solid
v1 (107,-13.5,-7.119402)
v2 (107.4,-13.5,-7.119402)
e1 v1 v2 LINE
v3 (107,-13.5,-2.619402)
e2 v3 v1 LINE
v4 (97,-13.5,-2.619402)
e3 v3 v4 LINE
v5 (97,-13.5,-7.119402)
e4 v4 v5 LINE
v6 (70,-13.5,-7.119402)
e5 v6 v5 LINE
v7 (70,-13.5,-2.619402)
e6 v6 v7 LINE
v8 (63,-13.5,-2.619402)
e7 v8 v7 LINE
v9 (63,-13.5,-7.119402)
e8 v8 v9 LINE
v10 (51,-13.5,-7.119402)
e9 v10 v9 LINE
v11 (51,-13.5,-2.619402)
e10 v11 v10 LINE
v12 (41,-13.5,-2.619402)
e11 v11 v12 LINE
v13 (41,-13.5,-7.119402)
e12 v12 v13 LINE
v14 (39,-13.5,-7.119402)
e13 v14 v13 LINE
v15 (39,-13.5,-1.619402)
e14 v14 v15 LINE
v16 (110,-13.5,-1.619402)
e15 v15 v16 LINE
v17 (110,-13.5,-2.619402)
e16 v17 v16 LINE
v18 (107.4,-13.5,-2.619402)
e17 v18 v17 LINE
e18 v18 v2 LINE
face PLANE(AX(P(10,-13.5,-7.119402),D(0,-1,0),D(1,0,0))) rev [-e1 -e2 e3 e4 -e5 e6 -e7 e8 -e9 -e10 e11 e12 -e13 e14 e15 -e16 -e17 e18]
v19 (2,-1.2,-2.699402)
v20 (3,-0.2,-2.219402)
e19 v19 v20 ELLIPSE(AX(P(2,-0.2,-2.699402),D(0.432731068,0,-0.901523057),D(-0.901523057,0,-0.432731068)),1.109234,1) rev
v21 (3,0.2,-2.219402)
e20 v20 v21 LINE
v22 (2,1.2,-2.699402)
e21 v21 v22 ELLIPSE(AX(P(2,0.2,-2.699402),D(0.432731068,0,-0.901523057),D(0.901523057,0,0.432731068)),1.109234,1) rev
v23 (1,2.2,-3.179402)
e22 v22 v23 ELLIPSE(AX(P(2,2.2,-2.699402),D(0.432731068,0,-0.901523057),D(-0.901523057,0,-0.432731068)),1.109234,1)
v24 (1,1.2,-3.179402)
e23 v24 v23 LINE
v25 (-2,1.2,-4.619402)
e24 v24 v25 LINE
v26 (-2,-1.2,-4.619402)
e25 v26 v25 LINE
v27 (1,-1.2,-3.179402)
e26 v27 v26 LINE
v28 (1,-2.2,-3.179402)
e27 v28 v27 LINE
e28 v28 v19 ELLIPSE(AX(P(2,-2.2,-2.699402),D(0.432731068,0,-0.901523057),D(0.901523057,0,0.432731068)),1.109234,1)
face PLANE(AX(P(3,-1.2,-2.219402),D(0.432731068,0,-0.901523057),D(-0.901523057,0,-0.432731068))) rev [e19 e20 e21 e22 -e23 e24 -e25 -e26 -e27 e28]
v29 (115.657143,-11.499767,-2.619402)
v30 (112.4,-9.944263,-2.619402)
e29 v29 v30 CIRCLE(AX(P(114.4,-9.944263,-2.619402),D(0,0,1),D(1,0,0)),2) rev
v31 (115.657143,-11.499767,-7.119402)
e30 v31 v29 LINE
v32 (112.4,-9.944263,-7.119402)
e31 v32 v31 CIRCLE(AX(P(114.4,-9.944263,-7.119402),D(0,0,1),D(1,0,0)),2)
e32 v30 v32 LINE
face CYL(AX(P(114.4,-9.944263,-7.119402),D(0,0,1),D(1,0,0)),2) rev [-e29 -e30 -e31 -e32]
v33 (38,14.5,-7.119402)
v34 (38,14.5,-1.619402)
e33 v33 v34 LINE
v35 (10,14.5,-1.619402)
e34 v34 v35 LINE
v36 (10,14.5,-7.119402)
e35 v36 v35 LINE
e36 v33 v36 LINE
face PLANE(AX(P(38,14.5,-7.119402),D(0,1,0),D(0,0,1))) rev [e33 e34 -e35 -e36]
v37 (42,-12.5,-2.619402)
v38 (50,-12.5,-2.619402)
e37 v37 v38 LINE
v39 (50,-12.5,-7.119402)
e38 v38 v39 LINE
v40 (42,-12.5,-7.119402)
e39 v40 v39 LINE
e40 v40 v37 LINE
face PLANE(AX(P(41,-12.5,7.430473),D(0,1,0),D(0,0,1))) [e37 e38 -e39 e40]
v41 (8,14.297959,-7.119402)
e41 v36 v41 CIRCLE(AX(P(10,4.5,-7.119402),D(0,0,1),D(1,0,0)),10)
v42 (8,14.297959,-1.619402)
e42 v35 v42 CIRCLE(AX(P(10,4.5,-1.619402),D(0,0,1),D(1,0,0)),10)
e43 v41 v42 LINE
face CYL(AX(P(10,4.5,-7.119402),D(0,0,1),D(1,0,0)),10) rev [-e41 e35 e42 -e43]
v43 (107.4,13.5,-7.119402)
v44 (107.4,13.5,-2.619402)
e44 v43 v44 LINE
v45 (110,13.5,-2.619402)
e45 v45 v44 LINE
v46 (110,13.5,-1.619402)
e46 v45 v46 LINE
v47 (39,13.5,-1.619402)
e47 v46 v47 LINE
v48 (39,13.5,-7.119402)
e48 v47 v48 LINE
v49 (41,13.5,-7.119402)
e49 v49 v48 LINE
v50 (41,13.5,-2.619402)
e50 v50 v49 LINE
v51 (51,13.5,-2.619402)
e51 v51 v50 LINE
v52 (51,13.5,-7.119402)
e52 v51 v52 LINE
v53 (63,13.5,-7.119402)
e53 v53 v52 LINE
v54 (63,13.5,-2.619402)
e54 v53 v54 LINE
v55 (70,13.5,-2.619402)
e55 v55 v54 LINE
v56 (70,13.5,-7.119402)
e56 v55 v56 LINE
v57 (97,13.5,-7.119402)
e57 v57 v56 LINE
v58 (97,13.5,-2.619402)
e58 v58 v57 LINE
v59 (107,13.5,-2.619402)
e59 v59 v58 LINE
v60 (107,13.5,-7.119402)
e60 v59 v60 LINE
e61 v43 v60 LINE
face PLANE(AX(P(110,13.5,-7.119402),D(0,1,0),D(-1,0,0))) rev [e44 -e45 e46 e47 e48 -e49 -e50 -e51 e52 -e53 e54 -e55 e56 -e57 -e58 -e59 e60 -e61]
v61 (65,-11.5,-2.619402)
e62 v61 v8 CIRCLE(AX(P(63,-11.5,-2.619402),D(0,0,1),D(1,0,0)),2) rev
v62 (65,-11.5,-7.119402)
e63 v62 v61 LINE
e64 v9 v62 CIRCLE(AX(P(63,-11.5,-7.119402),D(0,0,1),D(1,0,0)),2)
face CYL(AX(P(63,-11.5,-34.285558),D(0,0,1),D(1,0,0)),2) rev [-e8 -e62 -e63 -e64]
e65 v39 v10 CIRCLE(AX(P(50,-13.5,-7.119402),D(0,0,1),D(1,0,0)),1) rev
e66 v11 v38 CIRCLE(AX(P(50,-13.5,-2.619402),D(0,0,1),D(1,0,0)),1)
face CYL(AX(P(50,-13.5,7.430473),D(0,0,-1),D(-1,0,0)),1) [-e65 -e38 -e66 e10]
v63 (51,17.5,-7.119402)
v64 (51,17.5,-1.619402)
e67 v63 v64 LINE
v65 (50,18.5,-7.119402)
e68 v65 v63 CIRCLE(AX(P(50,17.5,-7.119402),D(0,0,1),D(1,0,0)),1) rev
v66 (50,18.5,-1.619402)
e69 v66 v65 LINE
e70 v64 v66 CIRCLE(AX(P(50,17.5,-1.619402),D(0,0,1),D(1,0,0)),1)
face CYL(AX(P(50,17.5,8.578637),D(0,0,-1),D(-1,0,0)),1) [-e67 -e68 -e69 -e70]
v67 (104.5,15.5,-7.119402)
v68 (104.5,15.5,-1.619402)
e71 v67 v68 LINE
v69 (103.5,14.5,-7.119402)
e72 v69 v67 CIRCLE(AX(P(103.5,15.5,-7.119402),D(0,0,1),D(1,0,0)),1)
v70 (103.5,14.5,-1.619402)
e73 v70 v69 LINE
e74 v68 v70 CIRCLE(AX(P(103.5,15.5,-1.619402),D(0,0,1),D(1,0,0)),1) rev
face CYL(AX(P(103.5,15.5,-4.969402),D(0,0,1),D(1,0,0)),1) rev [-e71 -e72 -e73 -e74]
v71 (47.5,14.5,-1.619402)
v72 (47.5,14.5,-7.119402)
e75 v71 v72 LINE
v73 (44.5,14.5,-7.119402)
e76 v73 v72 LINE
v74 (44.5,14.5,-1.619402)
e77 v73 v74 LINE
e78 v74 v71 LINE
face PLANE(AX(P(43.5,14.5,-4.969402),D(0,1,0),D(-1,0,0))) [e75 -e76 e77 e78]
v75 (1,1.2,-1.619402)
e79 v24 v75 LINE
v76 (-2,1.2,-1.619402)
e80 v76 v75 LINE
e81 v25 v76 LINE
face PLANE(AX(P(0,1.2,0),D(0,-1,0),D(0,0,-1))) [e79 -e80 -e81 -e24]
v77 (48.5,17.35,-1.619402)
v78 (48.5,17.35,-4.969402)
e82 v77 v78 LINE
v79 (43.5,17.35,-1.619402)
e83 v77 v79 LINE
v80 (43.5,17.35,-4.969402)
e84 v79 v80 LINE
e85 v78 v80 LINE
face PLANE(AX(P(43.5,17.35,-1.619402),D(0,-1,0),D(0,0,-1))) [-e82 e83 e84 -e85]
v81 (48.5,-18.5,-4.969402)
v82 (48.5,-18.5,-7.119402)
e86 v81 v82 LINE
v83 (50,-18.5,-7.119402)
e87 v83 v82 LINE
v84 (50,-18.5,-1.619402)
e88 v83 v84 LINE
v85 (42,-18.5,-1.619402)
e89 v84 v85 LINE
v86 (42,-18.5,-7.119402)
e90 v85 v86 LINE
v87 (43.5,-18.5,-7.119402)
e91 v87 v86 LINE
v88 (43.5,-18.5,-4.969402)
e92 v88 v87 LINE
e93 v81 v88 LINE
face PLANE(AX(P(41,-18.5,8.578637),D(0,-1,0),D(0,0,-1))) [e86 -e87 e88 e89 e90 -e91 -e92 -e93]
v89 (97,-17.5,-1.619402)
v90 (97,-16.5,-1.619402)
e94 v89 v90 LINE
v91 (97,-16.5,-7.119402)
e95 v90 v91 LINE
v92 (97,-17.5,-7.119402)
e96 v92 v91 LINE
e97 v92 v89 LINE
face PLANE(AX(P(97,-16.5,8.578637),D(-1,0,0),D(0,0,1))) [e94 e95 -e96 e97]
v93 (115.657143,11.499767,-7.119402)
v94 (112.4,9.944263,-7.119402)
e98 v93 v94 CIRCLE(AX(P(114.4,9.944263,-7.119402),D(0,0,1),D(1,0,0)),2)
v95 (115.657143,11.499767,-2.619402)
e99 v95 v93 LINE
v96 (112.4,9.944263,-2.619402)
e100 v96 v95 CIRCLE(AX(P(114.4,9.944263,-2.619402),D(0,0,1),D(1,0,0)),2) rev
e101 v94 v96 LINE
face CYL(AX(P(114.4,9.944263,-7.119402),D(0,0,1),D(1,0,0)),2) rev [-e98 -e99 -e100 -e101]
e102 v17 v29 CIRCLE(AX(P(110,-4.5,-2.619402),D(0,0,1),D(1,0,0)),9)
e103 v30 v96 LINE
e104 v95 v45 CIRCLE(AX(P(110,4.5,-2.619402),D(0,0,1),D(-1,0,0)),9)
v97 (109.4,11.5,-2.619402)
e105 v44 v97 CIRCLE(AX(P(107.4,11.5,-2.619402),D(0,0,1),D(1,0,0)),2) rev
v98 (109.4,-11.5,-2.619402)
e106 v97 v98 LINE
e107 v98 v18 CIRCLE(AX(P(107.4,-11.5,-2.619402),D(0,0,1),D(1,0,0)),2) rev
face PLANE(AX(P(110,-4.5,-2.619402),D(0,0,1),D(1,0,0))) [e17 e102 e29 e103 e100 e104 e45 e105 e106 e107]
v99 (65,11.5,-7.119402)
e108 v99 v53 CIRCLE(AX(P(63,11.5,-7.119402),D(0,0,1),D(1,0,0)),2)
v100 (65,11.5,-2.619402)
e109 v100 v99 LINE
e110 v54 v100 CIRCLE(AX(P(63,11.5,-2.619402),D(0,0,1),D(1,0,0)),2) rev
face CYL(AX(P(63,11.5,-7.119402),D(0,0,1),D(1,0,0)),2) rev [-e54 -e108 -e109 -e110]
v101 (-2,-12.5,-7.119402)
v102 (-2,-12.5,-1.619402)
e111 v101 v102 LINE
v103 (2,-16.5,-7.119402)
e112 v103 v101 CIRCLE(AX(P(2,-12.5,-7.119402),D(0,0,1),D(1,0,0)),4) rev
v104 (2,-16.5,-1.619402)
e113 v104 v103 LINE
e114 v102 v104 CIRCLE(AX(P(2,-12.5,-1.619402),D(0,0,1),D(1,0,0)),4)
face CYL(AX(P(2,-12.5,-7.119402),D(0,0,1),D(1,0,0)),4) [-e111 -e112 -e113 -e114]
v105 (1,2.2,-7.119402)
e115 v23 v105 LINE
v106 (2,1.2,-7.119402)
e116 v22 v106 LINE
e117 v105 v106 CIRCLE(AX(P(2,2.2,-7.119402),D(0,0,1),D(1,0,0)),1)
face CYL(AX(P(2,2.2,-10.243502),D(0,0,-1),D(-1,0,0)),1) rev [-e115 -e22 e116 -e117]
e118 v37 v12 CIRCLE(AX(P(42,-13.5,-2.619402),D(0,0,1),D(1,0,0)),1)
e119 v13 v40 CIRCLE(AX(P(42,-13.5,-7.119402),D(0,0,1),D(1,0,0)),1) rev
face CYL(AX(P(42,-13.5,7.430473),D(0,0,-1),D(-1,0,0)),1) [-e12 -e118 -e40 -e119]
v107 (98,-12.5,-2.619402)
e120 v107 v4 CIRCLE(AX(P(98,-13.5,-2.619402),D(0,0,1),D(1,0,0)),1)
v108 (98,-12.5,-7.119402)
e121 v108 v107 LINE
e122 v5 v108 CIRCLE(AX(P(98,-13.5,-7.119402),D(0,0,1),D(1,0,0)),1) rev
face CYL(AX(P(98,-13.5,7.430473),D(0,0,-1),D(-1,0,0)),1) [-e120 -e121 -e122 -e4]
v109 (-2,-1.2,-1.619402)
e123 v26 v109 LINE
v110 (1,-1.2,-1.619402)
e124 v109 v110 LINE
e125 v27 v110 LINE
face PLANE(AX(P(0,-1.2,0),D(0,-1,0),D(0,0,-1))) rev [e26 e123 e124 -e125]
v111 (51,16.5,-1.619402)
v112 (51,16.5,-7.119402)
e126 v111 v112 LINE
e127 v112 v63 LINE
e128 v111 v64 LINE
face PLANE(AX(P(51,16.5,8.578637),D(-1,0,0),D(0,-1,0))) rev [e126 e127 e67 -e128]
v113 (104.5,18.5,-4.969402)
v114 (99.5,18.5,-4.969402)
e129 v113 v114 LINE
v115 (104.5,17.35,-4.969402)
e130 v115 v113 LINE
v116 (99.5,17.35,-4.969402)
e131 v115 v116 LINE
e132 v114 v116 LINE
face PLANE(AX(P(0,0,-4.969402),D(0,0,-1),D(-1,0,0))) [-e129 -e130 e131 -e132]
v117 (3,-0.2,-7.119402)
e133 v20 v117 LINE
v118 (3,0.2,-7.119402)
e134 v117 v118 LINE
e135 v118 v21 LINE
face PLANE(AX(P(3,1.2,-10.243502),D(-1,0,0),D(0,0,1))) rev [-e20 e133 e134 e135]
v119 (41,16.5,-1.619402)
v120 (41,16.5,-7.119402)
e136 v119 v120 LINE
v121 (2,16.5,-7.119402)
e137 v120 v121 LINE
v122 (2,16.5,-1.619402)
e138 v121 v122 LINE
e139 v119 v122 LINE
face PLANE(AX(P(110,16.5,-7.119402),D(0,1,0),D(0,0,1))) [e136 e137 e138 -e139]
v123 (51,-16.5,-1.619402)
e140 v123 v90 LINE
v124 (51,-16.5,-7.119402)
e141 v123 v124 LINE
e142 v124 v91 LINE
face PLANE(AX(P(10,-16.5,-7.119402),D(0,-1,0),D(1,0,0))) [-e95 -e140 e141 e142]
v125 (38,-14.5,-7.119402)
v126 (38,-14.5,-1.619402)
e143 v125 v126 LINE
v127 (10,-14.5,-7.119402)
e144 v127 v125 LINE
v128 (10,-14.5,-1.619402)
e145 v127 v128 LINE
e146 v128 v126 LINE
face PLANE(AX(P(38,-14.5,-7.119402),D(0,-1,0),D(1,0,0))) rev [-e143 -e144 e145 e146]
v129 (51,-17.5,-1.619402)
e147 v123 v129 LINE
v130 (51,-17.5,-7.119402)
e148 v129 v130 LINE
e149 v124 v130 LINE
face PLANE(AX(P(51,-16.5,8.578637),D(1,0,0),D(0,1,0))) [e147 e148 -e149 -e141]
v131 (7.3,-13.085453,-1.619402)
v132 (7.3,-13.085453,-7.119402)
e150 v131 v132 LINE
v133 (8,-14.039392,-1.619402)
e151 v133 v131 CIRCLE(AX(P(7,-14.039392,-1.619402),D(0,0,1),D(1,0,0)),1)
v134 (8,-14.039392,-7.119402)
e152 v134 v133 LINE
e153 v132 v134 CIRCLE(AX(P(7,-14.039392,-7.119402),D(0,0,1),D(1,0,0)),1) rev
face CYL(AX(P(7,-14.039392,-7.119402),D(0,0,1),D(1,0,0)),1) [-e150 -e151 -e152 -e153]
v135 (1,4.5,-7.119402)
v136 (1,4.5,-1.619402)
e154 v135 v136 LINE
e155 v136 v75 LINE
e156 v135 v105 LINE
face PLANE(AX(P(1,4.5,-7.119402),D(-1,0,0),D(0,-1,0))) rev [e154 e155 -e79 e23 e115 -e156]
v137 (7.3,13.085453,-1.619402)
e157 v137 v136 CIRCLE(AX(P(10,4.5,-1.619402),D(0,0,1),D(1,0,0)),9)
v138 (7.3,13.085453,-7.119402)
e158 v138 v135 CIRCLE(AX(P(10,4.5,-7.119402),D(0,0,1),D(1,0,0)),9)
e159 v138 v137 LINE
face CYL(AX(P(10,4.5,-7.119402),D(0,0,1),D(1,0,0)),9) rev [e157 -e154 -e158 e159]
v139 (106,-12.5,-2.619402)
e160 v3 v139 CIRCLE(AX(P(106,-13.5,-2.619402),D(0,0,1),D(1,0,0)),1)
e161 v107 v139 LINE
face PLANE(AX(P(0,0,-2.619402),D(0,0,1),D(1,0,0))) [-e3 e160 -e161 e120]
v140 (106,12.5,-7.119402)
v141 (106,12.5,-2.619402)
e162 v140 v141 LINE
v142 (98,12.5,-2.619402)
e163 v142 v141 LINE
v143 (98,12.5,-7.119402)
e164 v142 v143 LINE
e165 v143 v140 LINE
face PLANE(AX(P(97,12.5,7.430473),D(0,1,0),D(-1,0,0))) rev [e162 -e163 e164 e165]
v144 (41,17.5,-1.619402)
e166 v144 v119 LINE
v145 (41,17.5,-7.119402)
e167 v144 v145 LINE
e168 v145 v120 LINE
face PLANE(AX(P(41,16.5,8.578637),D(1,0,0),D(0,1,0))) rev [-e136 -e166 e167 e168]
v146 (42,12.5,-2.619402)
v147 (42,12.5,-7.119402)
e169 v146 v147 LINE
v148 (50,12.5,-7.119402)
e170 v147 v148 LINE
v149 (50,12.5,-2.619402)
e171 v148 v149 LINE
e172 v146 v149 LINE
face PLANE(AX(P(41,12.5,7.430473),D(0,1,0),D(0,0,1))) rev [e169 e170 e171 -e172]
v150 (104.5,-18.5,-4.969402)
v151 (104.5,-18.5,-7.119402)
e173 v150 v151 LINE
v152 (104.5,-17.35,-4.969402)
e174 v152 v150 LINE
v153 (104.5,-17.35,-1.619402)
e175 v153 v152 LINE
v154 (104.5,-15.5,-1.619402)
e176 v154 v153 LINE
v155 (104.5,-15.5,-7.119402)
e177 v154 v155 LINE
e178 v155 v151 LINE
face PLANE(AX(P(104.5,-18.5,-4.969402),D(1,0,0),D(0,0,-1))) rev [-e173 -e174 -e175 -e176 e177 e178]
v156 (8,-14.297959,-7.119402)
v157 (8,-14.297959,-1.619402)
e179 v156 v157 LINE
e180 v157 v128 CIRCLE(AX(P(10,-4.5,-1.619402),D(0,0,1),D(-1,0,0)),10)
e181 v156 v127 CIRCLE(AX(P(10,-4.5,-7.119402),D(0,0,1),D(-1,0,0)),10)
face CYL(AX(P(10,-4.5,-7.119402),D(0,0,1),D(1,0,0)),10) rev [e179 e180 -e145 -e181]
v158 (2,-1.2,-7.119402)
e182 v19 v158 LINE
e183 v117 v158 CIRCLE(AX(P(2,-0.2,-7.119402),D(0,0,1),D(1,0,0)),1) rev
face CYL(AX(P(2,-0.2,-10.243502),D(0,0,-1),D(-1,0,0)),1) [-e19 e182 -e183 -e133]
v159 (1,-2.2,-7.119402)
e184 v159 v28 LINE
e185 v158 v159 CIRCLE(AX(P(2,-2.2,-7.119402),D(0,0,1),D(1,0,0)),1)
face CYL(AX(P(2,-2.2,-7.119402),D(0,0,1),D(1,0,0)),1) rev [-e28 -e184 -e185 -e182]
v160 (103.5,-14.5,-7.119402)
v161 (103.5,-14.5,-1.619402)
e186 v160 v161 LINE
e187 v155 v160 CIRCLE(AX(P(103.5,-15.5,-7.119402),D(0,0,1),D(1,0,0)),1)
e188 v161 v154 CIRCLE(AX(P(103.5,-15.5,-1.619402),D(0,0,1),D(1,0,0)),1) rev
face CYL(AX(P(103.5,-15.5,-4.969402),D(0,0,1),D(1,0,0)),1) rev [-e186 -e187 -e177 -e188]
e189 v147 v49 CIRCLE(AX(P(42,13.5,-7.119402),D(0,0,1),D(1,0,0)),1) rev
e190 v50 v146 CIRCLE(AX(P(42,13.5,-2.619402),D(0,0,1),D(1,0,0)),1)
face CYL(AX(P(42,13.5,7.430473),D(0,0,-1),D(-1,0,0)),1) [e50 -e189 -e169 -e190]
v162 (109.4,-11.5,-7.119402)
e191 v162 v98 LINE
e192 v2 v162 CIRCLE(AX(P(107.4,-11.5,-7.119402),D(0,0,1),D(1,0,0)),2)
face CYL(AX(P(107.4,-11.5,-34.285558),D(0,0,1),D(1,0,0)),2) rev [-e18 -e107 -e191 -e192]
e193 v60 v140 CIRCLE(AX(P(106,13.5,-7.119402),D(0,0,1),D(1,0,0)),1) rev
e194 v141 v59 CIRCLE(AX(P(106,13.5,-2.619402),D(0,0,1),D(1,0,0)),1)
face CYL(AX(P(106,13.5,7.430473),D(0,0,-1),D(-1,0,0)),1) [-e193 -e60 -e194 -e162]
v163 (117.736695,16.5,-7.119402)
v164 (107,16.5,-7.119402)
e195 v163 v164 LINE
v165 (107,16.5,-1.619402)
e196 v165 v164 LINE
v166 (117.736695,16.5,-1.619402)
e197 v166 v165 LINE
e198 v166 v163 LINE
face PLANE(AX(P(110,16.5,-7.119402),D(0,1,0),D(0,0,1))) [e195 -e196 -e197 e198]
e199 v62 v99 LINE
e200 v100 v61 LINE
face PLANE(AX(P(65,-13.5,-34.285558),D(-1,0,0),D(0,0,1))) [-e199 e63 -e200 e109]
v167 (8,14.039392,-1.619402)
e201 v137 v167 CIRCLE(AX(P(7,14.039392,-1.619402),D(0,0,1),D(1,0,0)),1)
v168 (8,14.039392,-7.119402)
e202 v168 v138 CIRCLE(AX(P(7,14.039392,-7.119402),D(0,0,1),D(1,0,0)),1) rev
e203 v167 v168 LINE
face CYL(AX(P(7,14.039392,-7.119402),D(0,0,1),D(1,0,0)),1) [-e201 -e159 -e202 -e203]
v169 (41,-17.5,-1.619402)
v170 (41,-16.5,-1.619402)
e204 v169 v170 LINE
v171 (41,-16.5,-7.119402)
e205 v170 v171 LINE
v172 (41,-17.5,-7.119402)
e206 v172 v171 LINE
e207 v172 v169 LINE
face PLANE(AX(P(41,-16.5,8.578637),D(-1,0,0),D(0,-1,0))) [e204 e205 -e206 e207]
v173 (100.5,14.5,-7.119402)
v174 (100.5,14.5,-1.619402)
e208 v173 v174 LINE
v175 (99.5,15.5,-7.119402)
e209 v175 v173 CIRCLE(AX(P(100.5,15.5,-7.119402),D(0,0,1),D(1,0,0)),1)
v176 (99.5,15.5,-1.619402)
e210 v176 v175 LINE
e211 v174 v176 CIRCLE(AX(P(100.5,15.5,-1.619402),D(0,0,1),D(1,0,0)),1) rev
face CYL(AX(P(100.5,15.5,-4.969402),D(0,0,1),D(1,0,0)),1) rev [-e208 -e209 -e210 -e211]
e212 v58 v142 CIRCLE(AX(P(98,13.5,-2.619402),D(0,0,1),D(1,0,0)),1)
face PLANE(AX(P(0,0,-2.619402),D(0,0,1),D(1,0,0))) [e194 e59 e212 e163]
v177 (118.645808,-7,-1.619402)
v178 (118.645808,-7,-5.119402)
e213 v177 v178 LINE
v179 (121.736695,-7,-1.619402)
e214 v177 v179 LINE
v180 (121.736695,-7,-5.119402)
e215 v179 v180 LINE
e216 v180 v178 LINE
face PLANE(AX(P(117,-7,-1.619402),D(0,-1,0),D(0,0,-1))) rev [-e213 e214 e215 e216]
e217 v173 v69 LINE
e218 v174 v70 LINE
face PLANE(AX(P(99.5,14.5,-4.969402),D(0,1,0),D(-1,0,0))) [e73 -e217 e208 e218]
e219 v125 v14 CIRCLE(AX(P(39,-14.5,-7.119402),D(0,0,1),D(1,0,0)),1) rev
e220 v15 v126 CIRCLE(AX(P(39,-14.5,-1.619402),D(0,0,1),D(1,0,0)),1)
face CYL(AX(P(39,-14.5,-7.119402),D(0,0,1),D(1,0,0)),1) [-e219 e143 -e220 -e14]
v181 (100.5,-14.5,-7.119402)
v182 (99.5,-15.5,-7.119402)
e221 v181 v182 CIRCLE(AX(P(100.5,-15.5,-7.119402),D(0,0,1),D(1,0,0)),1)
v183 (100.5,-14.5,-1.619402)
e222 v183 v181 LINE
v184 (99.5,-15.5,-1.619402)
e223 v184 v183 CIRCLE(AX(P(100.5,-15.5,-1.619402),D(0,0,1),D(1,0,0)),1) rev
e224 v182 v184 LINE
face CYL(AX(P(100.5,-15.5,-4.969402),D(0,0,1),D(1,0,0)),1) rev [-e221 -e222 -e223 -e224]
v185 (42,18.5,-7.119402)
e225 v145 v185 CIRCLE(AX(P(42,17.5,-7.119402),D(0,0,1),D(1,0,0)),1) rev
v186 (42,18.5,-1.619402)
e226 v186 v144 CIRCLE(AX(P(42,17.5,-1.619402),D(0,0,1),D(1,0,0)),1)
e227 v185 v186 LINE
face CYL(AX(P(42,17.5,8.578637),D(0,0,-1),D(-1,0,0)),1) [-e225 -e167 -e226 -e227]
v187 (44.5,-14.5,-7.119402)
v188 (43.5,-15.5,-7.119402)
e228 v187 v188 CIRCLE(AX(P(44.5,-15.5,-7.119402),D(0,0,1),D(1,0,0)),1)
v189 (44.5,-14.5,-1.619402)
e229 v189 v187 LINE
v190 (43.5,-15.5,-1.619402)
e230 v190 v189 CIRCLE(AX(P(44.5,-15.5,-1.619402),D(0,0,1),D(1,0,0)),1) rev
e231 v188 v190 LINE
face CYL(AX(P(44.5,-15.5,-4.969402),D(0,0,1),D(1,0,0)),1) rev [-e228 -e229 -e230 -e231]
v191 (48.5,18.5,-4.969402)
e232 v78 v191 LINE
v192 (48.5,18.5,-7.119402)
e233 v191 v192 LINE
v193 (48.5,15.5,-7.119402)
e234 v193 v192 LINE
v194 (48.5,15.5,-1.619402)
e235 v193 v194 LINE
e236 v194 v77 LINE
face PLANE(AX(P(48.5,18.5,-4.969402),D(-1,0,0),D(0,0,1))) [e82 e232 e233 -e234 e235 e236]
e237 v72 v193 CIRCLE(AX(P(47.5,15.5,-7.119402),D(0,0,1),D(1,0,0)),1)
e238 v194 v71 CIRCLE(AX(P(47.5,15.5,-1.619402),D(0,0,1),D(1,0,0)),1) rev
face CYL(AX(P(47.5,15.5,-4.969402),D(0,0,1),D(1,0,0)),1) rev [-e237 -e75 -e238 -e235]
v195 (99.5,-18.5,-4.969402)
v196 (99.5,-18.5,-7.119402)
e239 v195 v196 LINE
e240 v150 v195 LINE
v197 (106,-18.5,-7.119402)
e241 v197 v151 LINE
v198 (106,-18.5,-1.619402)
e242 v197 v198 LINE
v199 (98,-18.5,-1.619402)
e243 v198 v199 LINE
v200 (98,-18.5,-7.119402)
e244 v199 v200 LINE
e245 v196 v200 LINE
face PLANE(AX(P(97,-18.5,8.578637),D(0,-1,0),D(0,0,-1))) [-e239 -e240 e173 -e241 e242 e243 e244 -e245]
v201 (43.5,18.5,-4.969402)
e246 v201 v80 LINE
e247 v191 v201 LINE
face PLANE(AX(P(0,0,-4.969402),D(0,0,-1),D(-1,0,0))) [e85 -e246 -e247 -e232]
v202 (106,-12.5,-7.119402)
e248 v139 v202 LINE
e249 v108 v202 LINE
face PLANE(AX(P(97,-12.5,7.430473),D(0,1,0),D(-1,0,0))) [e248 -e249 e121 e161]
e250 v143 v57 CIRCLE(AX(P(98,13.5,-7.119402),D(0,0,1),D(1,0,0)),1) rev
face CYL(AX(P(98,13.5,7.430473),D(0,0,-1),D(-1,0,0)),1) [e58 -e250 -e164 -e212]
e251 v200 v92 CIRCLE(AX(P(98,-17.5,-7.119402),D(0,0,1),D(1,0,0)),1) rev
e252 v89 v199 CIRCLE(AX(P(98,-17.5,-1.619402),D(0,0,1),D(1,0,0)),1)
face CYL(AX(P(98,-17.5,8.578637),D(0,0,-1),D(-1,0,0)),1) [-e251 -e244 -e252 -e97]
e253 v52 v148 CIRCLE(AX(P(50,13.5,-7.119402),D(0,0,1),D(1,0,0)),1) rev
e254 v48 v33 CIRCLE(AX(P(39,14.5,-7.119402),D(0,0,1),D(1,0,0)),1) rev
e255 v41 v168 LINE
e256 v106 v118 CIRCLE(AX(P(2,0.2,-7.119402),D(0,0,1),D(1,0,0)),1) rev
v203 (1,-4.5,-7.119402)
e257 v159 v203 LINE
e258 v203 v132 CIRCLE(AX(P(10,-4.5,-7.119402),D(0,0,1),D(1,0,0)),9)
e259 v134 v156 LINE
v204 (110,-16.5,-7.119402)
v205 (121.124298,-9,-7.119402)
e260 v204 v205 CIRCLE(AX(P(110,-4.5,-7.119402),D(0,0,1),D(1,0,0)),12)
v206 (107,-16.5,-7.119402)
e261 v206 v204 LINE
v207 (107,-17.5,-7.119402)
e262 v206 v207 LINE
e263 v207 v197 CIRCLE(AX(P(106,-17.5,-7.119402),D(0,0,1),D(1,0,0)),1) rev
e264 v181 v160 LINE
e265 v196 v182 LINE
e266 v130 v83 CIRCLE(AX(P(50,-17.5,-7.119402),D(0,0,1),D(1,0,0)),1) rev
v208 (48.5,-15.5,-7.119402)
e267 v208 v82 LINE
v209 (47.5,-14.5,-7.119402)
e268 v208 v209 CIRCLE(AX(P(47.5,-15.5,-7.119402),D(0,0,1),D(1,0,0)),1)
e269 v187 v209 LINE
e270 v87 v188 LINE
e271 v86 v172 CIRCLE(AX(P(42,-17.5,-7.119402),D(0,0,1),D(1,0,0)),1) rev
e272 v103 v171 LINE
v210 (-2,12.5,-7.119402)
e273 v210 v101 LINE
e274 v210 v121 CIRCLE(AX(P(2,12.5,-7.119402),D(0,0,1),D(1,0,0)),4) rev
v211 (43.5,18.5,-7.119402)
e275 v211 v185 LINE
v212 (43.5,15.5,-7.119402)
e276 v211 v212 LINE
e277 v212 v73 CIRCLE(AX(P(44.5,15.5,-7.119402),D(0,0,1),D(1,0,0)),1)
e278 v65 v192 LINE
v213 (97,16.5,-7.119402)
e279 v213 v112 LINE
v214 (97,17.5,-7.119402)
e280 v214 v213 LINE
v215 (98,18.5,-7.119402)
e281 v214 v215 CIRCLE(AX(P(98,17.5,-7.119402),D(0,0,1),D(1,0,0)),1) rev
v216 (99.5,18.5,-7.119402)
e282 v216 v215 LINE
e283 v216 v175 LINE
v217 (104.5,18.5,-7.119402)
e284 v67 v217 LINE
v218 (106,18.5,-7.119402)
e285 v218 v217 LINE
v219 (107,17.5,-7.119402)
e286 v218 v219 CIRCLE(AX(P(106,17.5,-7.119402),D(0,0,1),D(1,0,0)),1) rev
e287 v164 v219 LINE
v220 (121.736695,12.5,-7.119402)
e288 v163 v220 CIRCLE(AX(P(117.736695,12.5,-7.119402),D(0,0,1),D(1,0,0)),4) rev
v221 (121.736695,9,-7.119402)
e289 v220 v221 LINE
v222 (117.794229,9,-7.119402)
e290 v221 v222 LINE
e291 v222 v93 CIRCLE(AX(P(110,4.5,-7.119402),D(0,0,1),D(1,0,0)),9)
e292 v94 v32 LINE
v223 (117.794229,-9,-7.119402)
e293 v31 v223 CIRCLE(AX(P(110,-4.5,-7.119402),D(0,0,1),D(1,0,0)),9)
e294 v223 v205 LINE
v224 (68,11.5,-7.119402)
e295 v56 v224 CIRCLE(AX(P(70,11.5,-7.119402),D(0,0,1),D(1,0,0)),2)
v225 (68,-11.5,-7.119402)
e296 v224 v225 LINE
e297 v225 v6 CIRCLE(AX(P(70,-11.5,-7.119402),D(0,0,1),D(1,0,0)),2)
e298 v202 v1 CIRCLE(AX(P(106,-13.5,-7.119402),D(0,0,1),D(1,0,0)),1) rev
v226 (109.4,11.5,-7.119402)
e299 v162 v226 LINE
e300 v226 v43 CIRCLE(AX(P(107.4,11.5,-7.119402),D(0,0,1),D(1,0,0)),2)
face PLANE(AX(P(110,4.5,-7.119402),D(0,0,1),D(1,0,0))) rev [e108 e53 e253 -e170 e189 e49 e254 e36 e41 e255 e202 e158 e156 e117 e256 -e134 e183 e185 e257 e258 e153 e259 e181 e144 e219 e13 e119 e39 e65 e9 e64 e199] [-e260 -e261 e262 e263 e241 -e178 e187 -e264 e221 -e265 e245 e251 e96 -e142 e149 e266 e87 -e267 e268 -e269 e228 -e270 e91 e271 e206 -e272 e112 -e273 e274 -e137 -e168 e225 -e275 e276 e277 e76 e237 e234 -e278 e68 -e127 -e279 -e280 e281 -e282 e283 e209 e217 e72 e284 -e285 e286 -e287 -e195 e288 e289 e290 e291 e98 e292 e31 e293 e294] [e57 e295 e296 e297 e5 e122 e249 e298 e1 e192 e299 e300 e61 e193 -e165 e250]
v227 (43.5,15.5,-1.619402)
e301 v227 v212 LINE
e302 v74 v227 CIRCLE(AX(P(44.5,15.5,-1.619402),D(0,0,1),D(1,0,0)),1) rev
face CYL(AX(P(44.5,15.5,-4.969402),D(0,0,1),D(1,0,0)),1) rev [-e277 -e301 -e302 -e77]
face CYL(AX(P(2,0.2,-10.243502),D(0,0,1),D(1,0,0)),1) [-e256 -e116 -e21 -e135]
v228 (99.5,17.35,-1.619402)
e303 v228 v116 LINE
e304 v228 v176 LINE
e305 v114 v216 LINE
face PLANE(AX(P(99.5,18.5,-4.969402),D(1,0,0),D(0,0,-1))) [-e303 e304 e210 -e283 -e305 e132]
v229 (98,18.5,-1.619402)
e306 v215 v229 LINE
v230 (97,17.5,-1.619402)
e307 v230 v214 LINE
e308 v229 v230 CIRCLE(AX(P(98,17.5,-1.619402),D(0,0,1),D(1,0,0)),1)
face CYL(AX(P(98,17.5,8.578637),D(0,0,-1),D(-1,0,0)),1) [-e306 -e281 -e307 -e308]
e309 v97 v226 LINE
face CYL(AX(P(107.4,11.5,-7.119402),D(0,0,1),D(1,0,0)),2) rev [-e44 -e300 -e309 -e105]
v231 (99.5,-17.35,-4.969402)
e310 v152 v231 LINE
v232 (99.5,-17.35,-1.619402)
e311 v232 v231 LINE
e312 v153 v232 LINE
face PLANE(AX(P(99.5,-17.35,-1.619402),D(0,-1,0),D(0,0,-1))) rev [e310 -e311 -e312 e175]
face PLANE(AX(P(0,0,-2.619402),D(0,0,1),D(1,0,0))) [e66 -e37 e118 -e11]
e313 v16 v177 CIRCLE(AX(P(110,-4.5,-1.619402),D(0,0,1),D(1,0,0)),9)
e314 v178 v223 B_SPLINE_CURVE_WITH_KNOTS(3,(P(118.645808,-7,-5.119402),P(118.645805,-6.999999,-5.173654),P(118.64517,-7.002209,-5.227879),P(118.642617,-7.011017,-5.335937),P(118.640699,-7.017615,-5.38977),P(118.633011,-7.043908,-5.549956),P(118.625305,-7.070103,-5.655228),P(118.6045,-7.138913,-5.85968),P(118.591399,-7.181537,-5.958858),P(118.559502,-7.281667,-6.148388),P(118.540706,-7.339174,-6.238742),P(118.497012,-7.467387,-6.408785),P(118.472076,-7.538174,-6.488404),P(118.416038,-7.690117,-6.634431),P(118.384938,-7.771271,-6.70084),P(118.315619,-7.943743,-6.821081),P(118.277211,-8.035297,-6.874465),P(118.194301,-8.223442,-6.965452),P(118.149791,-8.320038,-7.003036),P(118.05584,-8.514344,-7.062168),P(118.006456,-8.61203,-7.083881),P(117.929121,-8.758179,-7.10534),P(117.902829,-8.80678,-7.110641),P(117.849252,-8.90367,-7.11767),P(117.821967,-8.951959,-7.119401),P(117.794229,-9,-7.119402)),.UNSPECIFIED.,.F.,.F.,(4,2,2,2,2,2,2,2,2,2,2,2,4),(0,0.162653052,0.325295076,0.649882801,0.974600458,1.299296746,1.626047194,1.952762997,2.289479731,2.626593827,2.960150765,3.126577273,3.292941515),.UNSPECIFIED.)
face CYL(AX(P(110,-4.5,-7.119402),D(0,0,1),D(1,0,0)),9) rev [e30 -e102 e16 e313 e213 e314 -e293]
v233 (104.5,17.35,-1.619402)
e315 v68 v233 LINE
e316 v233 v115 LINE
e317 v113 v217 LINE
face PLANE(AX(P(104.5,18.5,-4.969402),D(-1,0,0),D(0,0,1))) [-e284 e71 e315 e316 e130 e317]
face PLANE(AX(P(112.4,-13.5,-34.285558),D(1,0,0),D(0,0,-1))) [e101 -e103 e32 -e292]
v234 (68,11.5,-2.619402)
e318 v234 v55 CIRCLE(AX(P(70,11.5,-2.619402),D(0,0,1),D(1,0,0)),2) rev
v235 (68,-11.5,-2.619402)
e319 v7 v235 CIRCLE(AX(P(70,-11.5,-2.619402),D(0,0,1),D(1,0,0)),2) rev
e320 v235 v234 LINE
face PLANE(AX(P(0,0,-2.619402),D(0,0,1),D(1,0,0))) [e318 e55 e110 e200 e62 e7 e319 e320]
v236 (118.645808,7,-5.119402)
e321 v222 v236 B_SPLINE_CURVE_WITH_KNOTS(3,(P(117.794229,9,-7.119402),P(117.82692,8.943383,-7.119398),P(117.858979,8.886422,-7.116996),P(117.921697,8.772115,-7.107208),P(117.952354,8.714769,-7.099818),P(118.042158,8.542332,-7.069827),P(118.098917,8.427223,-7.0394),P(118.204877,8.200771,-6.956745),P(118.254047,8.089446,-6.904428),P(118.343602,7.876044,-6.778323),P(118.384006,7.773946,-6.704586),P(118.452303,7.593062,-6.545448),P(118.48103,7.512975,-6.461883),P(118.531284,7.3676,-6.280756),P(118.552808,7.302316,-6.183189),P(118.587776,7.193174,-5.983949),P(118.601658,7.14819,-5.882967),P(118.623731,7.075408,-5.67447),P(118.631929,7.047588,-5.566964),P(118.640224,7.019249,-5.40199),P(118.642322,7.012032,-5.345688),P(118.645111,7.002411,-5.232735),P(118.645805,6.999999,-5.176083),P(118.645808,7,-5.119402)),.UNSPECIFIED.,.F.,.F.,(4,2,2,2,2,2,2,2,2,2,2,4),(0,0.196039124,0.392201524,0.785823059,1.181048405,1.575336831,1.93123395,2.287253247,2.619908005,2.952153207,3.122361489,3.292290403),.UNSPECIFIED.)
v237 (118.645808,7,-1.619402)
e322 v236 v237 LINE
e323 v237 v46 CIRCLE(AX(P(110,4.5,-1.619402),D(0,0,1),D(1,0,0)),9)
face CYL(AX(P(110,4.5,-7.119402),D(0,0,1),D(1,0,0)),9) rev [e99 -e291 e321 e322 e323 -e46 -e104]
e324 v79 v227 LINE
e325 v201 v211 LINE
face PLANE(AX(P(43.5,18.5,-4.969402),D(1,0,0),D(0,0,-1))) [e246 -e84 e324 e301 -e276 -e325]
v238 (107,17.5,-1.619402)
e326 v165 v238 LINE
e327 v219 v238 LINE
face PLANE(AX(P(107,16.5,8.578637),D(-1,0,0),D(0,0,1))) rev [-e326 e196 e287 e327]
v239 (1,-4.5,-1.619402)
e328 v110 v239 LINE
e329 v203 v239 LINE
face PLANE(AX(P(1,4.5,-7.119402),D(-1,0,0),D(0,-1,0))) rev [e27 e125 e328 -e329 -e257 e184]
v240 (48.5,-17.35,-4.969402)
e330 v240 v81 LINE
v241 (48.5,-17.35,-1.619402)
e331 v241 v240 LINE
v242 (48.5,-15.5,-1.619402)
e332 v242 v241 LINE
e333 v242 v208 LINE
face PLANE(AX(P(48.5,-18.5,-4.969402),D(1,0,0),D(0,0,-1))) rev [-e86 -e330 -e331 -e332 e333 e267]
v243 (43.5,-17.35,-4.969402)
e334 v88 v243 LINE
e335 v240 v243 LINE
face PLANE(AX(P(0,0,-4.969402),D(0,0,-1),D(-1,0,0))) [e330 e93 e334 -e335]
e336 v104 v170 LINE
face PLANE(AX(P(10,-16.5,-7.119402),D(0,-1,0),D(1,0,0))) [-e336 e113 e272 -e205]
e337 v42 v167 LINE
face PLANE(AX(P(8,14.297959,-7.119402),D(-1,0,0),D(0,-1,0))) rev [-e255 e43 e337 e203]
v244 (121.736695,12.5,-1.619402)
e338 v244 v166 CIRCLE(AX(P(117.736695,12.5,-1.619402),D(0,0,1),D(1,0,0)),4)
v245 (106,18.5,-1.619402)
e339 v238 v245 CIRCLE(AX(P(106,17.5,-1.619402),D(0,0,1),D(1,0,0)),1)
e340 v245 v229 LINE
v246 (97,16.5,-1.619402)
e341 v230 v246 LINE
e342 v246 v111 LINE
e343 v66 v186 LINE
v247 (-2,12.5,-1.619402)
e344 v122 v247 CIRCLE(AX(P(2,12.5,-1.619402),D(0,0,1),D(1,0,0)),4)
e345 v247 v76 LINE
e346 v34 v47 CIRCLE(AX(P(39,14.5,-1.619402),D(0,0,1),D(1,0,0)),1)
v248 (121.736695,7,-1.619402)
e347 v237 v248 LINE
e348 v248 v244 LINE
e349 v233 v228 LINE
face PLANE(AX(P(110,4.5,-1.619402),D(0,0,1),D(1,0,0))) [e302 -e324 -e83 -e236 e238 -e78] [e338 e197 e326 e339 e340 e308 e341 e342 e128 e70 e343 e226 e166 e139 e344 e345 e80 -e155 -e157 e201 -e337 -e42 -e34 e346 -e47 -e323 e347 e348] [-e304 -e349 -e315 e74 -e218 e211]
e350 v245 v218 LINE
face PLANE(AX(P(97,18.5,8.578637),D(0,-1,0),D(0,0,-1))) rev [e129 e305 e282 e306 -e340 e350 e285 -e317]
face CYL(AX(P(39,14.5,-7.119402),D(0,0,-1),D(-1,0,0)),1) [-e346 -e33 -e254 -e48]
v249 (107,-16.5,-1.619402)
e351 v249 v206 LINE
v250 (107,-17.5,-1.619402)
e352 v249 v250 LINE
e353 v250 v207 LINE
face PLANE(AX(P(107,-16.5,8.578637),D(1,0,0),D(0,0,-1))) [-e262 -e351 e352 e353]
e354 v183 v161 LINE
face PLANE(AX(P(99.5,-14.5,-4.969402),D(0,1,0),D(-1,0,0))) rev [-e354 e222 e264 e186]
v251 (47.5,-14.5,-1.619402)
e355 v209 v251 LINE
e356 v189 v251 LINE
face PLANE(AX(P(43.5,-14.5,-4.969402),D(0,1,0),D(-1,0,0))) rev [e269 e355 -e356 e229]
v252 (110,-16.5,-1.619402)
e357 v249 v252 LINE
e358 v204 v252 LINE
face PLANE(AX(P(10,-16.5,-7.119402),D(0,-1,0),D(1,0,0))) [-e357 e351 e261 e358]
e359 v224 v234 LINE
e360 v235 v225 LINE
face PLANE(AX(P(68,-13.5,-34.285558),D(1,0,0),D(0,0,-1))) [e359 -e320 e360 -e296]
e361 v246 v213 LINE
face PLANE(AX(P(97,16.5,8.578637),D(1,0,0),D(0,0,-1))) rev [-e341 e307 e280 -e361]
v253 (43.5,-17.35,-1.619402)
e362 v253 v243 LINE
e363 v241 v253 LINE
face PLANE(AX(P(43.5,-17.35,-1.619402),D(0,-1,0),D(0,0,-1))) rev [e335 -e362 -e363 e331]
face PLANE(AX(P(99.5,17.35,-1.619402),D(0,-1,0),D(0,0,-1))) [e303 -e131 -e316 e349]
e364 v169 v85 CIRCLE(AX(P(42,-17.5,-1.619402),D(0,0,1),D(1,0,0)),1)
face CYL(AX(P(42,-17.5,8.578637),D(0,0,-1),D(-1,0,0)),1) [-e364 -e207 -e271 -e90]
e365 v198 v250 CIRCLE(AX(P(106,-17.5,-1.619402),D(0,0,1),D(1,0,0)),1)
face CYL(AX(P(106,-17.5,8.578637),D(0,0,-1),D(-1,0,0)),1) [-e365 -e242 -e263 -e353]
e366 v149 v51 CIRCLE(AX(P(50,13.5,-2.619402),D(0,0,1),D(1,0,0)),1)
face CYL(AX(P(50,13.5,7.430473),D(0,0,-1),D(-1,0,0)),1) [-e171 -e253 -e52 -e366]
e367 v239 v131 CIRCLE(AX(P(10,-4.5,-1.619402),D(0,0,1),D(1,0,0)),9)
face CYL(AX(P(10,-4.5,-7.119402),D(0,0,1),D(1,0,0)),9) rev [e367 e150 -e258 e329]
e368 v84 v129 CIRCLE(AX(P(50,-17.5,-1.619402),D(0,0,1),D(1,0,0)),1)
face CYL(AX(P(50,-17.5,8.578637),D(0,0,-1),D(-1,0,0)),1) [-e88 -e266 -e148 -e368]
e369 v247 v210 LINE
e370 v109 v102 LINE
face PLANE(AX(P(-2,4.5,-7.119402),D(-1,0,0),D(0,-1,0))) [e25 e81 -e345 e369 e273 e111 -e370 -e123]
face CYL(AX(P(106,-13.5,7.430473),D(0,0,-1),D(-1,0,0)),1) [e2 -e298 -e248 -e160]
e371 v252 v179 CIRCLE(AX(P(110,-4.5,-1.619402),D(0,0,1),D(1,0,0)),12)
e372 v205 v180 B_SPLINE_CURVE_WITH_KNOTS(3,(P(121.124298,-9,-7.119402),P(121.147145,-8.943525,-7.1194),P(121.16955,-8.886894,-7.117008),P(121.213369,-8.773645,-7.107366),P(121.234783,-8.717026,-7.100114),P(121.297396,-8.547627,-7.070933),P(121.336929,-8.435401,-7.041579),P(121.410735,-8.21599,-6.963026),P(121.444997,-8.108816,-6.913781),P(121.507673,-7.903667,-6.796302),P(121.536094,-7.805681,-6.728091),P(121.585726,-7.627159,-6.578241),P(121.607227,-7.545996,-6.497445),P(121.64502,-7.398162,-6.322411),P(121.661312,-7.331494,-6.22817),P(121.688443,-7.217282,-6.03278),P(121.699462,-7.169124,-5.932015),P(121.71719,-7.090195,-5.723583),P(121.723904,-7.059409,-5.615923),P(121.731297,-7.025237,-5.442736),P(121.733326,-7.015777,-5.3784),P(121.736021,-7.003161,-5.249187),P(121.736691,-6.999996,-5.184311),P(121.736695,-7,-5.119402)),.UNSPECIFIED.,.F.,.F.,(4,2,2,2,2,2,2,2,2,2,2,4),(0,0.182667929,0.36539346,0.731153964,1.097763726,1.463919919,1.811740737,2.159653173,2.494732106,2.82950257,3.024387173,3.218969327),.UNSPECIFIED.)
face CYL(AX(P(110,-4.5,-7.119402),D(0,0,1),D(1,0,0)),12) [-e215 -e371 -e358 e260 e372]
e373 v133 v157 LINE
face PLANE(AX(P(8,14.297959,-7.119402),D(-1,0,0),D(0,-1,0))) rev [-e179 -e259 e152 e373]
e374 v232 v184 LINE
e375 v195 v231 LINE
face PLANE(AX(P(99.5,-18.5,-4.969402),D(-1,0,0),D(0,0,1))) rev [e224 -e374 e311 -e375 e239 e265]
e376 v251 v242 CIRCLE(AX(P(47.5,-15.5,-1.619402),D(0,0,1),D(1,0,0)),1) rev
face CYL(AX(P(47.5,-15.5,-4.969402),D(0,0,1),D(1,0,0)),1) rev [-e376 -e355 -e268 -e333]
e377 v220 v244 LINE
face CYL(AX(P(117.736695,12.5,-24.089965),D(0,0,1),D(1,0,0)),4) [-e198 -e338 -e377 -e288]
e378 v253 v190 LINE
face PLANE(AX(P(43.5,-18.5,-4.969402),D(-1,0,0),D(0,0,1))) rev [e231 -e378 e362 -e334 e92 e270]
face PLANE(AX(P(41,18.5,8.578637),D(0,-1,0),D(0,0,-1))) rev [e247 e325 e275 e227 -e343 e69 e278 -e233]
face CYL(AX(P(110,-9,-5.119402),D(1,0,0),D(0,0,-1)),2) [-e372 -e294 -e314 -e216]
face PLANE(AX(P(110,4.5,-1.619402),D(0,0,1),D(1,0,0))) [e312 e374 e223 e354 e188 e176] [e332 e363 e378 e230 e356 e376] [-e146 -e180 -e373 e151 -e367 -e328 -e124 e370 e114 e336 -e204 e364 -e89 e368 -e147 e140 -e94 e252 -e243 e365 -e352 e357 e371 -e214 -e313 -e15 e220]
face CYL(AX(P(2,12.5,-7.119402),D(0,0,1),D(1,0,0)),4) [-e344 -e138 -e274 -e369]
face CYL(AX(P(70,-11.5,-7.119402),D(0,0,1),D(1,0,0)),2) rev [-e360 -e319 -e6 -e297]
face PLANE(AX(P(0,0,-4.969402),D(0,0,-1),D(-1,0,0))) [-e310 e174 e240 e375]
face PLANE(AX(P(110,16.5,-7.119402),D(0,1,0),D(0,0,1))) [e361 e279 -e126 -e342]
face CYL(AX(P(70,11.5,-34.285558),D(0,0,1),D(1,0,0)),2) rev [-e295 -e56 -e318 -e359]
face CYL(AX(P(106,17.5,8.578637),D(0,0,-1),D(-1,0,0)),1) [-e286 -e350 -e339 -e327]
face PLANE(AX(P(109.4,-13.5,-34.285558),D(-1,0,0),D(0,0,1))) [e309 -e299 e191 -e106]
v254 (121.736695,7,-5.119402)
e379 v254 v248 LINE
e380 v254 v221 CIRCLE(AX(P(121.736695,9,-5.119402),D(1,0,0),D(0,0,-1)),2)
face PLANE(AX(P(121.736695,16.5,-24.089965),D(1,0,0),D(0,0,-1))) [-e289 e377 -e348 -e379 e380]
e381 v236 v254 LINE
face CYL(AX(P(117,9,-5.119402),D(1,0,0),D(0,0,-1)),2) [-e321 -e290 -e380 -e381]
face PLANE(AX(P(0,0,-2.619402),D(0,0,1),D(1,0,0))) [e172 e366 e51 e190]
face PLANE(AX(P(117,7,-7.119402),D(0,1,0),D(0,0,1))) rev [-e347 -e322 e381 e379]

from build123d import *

# Parameters (mm, degrees)
BOSS_EXTRUDE2_DEPTH                        = 5.5
SKETCH4_W                                  = 3
SKETCH4_H                                  = 27
BOSS_EXTRUDE4_CROSS_STRUCTURES_DEPTH       = 5.5
SKETCH6_W                                  = 3
SKETCH6_H                                  = 27
CUT_EXTRUDE3_1_MM_SPACING_DEPTH            = 1
CUT_EXTRUDE4_ELECTRONICS_SPACING_DEPTH     = 124.233518168
SKETCH8_W                                  = 5.5
SKETCH8_H                                  = 14
CUT_EXTRUDE2_USB_C_CUTOUT_DEPTH            = 5
SKETCH10_W                                 = 2
SKETCH10_H                                 = 2.4
BOSS_EXTRUDE3_DEPTH                        = 5.5
CUT_EXTRUDE1_LED_OPENING_DEPTH             = 1.2
SKETCH12_W                                 = 10
SKETCH12_H                                 = 2
BOSS_EXTRUDE4_SNAP_BUMPS_DEPTH             = 5.5
SKETCH13_W                                 = 5
SKETCH13_H                                 = 4
CUT_EXTRUDE2_SNAP_SEAT_2_15_ORIGINAL_DEPTH = 2.15
SKETCH14_W                                 = 5
SKETCH14_H                                 = 2.85
CUT_EXTRUDE3_SNAP_POST_CUT_DEPTH           = 124.179930633
SKETCH15_W                                 = 10
SKETCH15_H                                 = 1
BOSS_EXTRUDE4_DEPTH                        = 4.5
FILLET3_R                                  = 1
FILLET4_R                                  = 1
FILLET5_R                                  = 2
FILLET6_SNAP_FEATURES_R                    = 1
BOSS_EXTRUDE7_DEPTH                        = 5.5
FILLET7_R                                  = 4
FILLET8_R                                  = 2


with BuildPart() as part:
    # Sketch3 → Boss-Extrude2 (new body)
    with BuildSketch(Plane.XY.offset(-1.6194024)):
        with BuildLine():
            Line((110, 16.5), (10, 16.5))
            ThreePointArc((10, 16.5), (1.514718626, 12.985281374), (-2, 4.5))
            Line((-2, 4.5), (-2, -4.5))
            ThreePointArc((-2, -4.5), (1.514718626, -12.985281374), (10, -16.5))
            Line((10, -16.5), (110, -16.5))
            ThreePointArc((110, -16.5), (118.485281374, -12.985281374), (122, -4.5))
            Line((122, -4.5), (122, 4.5))
            ThreePointArc((122, 4.5), (118.485281374, 12.985281374), (110, 16.5))
        make_face()
        with BuildLine():
            Line((119, -4.5), (119, 4.5))
            ThreePointArc((119, 4.5), (116.363961031, 10.863961031), (110, 13.5))
            Line((110, 13.5), (10, 13.5))
            ThreePointArc((10, 13.5), (3.636038969, 10.863961031), (1, 4.5))
            Line((1, 4.5), (1, -4.5))
            ThreePointArc((1, -4.5), (3.636038969, -10.863961031), (10, -13.5))
            Line((10, -13.5), (110, -13.5))
            ThreePointArc((110, -13.5), (116.363961031, -10.863961031), (119, -4.5))
        make_face(mode=Mode.SUBTRACT)
    extrude(amount=-BOSS_EXTRUDE2_DEPTH)

    # Sketch4 → Boss-Extrude4 - cross structures (add)
    with BuildSketch(Plane.XY.offset(-1.6194024)):
        with Locations((110.9, 0)):
            Rectangle(SKETCH4_W, SKETCH4_H)
        with Locations((66.5, 0)):
            Rectangle(SKETCH4_W, SKETCH4_H)
    extrude(amount=-BOSS_EXTRUDE4_CROSS_STRUCTURES_DEPTH)

    # Sketch6 → Cut-Extrude3 - 1 mm spacing (cut)
    with BuildSketch(Plane.XY.offset(-1.6194024)):
        with BuildLine():
            Line((109.4, 13.5), (110, 13.5))
            ThreePointArc((110, 13.5), (111.211013131, 13.418152678), (112.4, 13.174099377))
            Line((112.4, 13.174099377), (112.4, -13.174099377))
            ThreePointArc((112.4, -13.174099377), (111.211013131, -13.418152678), (110, -13.5))
            Line((110, -13.5), (109.4, -13.5))
            Line((109.4, -13.5), (109.4, 13.5))
        make_face()
        with Locations((66.5, 0)):
            Rectangle(SKETCH6_W, SKETCH6_H)
    extrude(amount=-CUT_EXTRUDE3_1_MM_SPACING_DEPTH, mode=Mode.SUBTRACT)

    # Sketch7 → Cut-Extrude4 - electronics spacing (cut, through all)
    with BuildSketch(Plane.XY.offset(-1.6194024)):
        with BuildLine():
            Line((38, -14.5), (10, -14.5))
            ThreePointArc((10, -14.5), (8.99491038, -14.44936153), (8, -14.297958971))
            Line((8, -14.297958971), (8, 14.297958971))
            ThreePointArc((8, 14.297958971), (8.99491038, 14.44936153), (10, 14.5))
            Line((10, 14.5), (38, 14.5))
            Line((38, 14.5), (38, -14.5))
        make_face()
    extrude(amount=-CUT_EXTRUDE4_ELECTRONICS_SPACING_DEPTH, mode=Mode.SUBTRACT)

    # Sketch8 → Cut-Extrude2 - USB-C cutout (cut)
    with BuildSketch(Plane(origin=(122, 0, 0), x_dir=(0, 0, -1), z_dir=(1, 0, 0))):
        with Locations((4.3694024, 0)):
            Rectangle(SKETCH8_W, SKETCH8_H)
    extrude(amount=-CUT_EXTRUDE2_USB_C_CUTOUT_DEPTH, mode=Mode.SUBTRACT)

    # Sketch10 → Boss-Extrude3 (add)
    with BuildSketch(Plane.XY.offset(-1.6194024)):
        with Locations((2, 0)):
            Rectangle(SKETCH10_W, SKETCH10_H)
    extrude(amount=-BOSS_EXTRUDE3_DEPTH)

    # Sketch11 → Cut-Extrude1 - LED opening (cut, symmetric)
    with BuildSketch(Plane(origin=(0, 0, 0), x_dir=(1, 0, 0), z_dir=(0, 1, 0))):
        Polygon((3, 2.2194024), (-2, 4.6194024), (-2, 1.6194024), (3, 1.6194024), align=None)
    extrude(amount=CUT_EXTRUDE1_LED_OPENING_DEPTH, both=True, mode=Mode.SUBTRACT)

    # Sketch12 → Boss-Extrude4 - snap bumps (add)
    with BuildSketch(Plane(origin=(0, 0, -7.1194024), x_dir=(-1, 0, 0), z_dir=(0, 0, -1))):
        with Locations((-46, -17.5)):
            Rectangle(SKETCH12_W, SKETCH12_H)
        with Locations((-102, -17.5)):
            Rectangle(SKETCH12_W, SKETCH12_H)
    boss_extrude4_snap_bumps = extrude(amount=-BOSS_EXTRUDE4_SNAP_BUMPS_DEPTH)

    # Sketch13 → Cut-Extrude2 - snap seat (2.15, original is 2.0) (cut)
    with BuildSketch(Plane(origin=(0, 0, -7.1194024), x_dir=(-1, 0, 0), z_dir=(0, 0, -1))):
        with Locations((-46, -16.5)):
            Rectangle(SKETCH13_W, SKETCH13_H)
        with Locations((-102, -16.5)):
            Rectangle(SKETCH13_W, SKETCH13_H)
    cut_extrude2_snap_seat_2_15_original = extrude(amount=-CUT_EXTRUDE2_SNAP_SEAT_2_15_ORIGINAL_DEPTH, mode=Mode.SUBTRACT)

    # Sketch14 → Cut-Extrude3 - snap post cut (cut, through all)
    with BuildSketch(Plane(origin=(0, 0, -4.9694024), x_dir=(-1, 0, 0), z_dir=(0, 0, -1))):
        with Locations((-46, -15.925)):
            Rectangle(SKETCH14_W, SKETCH14_H)
        with Locations((-102, -15.925)):
            Rectangle(SKETCH14_W, SKETCH14_H)
    cut_extrude3_snap_post_cut = extrude(amount=-CUT_EXTRUDE3_SNAP_POST_CUT_DEPTH, mode=Mode.SUBTRACT)

    # Sketch15 → Boss-Extrude4 (add)
    with BuildSketch(Plane(origin=(0, 0, -7.1194024), x_dir=(-1, 0, 0), z_dir=(0, 0, -1))):
        with Locations((-46, -13)):
            Rectangle(SKETCH15_W, SKETCH15_H)
        with Locations((-102, -13)):
            Rectangle(SKETCH15_W, SKETCH15_H)
    boss_extrude4 = extrude(amount=-BOSS_EXTRUDE4_DEPTH)

    # Mirror1: Boss-Extrude4 - snap bumps, Cut-Extrude2 - snap seat (2.15, original is 2.0), Cut-Extrude3 - snap post cut, Boss-Extrude4 across plane
    add(boss_extrude4_snap_bumps.mirror(Plane.ZX))
    add(cut_extrude2_snap_seat_2_15_original.mirror(Plane.ZX), mode=Mode.SUBTRACT)
    add(cut_extrude3_snap_post_cut.mirror(Plane.ZX), mode=Mode.SUBTRACT)
    add(boss_extrude4.mirror(Plane.ZX))

    # Fillet3
    fillet3_edges = [part.edges().sort_by_distance(p)[0] for p in [
        (38, 13.5, -4.3694024),
        (38, -13.5, -4.3694024),
        (8, -13.274964387, -4.3694024),
        (8, 13.274964387, -4.3694024),
    ]]
    fillet(fillet3_edges, radius=FILLET3_R - 0.0001)  # a hair under: the kernel refuses the full size

    # Fillet4
    fillet4_edges = [part.edges().sort_by_distance(p)[0] for p in [
        (1, 1.2, -5.1494024),
        (3, 1.2, -4.6694024),
        (3, -1.2, -4.6694024),
        (1, -1.2, -5.1494024),
    ]]
    fillet(fillet4_edges, radius=FILLET4_R - 0.0001)  # a hair under: the kernel refuses the full size

    # Fillet5
    fillet5_edges = [part.edges().sort_by_distance(p)[0] for p in [
        (112.4, -13.174099377, -4.8694024),
        (109.4, -13.5, -4.8694024),
        (109.4, 13.5, -4.8694024),
        (65, -13.5, -4.8694024),
        (65, 13.5, -4.8694024),
        (68, 13.5, -4.8694024),
        (68, -13.5, -4.8694024),
        (112.4, 13.174099377, -4.8694024),
    ]]
    fillet(fillet5_edges, radius=FILLET5_R)

    # Fillet6 - snap features
    fillet6_snap_features_edges = [part.edges().sort_by_distance(p)[0] for p in [
        (51, -18.5, -4.3694024),
        (41, -18.5, -4.3694024),
        (107, -18.5, -4.3694024),
        (97, -18.5, -4.3694024),
        (43.5, -14.5, -4.3694024),
        (48.5, -14.5, -4.3694024),
        (99.5, -14.5, -4.3694024),
        (104.5, -14.5, -4.3694024),
        (51, -12.5, -4.8694024),
        (41, -12.5, -4.8694024),
        (107, -12.5, -4.8694024),
        (97, -12.5, -4.8694024),
        (41, 18.5, -4.3694024),
        (51, 18.5, -4.3694024),
        (97, 18.5, -4.3694024),
        (107, 18.5, -4.3694024),
        (43.5, 14.5, -4.3694024),
        (48.5, 14.5, -4.3694024),
        (99.5, 14.5, -4.3694024),
        (104.5, 14.5, -4.3694024),
        (41, 12.5, -4.8694024),
        (51, 12.5, -4.8694024),
        (97, 12.5, -4.8694024),
        (107, 12.5, -4.8694024),
    ]]
    fillet(fillet6_snap_features_edges, radius=FILLET6_SNAP_FEATURES_R - 0.0001)  # a hair under: the kernel refuses the full size

    # Sketch18 → Boss-Extrude7 (add)
    with BuildSketch(Plane.XY.offset(-1.6194024)):
        with BuildLine():
            Line((110, 16.5), (121.736694594, 16.5))
            Line((121.736694594, 16.5), (121.736694594, 7))
            ThreePointArc((121.736694594, 7), (117.549834435, 13.827379053), (110, 16.5))
        make_face()
        with BuildLine():
            Line((-2, 4.5), (-2, 16.5))
            Line((-2, 16.5), (10, 16.5))
            ThreePointArc((10, 16.5), (1.514718626, 12.985281374), (-2, 4.5))
        make_face()
        with BuildLine():
            Line((-2, -4.5), (-2, -16.5))
            Line((-2, -16.5), (10, -16.5))
            ThreePointArc((10, -16.5), (1.514718626, -12.985281374), (-2, -4.5))
        make_face()
    extrude(amount=-BOSS_EXTRUDE7_DEPTH)

    # Fillet7
    fillet7_edges = [part.edges().sort_by_distance(p)[0] for p in [
        (121.736694594, 16.5, -4.3694024),
        (-2, 16.5, -4.3694024),
        (-2, -16.5, -4.3694024),
    ]]
    fillet(fillet7_edges, radius=FILLET7_R)

    # Fillet8
    fillet8_edges = [part.edges().sort_by_distance(p)[0] for p in [
        (120.191251414, 7, -7.1194024),
        (120.191251414, -7, -7.1194024),
    ]]
    fillet(fillet8_edges, radius=FILLET8_R)


solid = part.part
